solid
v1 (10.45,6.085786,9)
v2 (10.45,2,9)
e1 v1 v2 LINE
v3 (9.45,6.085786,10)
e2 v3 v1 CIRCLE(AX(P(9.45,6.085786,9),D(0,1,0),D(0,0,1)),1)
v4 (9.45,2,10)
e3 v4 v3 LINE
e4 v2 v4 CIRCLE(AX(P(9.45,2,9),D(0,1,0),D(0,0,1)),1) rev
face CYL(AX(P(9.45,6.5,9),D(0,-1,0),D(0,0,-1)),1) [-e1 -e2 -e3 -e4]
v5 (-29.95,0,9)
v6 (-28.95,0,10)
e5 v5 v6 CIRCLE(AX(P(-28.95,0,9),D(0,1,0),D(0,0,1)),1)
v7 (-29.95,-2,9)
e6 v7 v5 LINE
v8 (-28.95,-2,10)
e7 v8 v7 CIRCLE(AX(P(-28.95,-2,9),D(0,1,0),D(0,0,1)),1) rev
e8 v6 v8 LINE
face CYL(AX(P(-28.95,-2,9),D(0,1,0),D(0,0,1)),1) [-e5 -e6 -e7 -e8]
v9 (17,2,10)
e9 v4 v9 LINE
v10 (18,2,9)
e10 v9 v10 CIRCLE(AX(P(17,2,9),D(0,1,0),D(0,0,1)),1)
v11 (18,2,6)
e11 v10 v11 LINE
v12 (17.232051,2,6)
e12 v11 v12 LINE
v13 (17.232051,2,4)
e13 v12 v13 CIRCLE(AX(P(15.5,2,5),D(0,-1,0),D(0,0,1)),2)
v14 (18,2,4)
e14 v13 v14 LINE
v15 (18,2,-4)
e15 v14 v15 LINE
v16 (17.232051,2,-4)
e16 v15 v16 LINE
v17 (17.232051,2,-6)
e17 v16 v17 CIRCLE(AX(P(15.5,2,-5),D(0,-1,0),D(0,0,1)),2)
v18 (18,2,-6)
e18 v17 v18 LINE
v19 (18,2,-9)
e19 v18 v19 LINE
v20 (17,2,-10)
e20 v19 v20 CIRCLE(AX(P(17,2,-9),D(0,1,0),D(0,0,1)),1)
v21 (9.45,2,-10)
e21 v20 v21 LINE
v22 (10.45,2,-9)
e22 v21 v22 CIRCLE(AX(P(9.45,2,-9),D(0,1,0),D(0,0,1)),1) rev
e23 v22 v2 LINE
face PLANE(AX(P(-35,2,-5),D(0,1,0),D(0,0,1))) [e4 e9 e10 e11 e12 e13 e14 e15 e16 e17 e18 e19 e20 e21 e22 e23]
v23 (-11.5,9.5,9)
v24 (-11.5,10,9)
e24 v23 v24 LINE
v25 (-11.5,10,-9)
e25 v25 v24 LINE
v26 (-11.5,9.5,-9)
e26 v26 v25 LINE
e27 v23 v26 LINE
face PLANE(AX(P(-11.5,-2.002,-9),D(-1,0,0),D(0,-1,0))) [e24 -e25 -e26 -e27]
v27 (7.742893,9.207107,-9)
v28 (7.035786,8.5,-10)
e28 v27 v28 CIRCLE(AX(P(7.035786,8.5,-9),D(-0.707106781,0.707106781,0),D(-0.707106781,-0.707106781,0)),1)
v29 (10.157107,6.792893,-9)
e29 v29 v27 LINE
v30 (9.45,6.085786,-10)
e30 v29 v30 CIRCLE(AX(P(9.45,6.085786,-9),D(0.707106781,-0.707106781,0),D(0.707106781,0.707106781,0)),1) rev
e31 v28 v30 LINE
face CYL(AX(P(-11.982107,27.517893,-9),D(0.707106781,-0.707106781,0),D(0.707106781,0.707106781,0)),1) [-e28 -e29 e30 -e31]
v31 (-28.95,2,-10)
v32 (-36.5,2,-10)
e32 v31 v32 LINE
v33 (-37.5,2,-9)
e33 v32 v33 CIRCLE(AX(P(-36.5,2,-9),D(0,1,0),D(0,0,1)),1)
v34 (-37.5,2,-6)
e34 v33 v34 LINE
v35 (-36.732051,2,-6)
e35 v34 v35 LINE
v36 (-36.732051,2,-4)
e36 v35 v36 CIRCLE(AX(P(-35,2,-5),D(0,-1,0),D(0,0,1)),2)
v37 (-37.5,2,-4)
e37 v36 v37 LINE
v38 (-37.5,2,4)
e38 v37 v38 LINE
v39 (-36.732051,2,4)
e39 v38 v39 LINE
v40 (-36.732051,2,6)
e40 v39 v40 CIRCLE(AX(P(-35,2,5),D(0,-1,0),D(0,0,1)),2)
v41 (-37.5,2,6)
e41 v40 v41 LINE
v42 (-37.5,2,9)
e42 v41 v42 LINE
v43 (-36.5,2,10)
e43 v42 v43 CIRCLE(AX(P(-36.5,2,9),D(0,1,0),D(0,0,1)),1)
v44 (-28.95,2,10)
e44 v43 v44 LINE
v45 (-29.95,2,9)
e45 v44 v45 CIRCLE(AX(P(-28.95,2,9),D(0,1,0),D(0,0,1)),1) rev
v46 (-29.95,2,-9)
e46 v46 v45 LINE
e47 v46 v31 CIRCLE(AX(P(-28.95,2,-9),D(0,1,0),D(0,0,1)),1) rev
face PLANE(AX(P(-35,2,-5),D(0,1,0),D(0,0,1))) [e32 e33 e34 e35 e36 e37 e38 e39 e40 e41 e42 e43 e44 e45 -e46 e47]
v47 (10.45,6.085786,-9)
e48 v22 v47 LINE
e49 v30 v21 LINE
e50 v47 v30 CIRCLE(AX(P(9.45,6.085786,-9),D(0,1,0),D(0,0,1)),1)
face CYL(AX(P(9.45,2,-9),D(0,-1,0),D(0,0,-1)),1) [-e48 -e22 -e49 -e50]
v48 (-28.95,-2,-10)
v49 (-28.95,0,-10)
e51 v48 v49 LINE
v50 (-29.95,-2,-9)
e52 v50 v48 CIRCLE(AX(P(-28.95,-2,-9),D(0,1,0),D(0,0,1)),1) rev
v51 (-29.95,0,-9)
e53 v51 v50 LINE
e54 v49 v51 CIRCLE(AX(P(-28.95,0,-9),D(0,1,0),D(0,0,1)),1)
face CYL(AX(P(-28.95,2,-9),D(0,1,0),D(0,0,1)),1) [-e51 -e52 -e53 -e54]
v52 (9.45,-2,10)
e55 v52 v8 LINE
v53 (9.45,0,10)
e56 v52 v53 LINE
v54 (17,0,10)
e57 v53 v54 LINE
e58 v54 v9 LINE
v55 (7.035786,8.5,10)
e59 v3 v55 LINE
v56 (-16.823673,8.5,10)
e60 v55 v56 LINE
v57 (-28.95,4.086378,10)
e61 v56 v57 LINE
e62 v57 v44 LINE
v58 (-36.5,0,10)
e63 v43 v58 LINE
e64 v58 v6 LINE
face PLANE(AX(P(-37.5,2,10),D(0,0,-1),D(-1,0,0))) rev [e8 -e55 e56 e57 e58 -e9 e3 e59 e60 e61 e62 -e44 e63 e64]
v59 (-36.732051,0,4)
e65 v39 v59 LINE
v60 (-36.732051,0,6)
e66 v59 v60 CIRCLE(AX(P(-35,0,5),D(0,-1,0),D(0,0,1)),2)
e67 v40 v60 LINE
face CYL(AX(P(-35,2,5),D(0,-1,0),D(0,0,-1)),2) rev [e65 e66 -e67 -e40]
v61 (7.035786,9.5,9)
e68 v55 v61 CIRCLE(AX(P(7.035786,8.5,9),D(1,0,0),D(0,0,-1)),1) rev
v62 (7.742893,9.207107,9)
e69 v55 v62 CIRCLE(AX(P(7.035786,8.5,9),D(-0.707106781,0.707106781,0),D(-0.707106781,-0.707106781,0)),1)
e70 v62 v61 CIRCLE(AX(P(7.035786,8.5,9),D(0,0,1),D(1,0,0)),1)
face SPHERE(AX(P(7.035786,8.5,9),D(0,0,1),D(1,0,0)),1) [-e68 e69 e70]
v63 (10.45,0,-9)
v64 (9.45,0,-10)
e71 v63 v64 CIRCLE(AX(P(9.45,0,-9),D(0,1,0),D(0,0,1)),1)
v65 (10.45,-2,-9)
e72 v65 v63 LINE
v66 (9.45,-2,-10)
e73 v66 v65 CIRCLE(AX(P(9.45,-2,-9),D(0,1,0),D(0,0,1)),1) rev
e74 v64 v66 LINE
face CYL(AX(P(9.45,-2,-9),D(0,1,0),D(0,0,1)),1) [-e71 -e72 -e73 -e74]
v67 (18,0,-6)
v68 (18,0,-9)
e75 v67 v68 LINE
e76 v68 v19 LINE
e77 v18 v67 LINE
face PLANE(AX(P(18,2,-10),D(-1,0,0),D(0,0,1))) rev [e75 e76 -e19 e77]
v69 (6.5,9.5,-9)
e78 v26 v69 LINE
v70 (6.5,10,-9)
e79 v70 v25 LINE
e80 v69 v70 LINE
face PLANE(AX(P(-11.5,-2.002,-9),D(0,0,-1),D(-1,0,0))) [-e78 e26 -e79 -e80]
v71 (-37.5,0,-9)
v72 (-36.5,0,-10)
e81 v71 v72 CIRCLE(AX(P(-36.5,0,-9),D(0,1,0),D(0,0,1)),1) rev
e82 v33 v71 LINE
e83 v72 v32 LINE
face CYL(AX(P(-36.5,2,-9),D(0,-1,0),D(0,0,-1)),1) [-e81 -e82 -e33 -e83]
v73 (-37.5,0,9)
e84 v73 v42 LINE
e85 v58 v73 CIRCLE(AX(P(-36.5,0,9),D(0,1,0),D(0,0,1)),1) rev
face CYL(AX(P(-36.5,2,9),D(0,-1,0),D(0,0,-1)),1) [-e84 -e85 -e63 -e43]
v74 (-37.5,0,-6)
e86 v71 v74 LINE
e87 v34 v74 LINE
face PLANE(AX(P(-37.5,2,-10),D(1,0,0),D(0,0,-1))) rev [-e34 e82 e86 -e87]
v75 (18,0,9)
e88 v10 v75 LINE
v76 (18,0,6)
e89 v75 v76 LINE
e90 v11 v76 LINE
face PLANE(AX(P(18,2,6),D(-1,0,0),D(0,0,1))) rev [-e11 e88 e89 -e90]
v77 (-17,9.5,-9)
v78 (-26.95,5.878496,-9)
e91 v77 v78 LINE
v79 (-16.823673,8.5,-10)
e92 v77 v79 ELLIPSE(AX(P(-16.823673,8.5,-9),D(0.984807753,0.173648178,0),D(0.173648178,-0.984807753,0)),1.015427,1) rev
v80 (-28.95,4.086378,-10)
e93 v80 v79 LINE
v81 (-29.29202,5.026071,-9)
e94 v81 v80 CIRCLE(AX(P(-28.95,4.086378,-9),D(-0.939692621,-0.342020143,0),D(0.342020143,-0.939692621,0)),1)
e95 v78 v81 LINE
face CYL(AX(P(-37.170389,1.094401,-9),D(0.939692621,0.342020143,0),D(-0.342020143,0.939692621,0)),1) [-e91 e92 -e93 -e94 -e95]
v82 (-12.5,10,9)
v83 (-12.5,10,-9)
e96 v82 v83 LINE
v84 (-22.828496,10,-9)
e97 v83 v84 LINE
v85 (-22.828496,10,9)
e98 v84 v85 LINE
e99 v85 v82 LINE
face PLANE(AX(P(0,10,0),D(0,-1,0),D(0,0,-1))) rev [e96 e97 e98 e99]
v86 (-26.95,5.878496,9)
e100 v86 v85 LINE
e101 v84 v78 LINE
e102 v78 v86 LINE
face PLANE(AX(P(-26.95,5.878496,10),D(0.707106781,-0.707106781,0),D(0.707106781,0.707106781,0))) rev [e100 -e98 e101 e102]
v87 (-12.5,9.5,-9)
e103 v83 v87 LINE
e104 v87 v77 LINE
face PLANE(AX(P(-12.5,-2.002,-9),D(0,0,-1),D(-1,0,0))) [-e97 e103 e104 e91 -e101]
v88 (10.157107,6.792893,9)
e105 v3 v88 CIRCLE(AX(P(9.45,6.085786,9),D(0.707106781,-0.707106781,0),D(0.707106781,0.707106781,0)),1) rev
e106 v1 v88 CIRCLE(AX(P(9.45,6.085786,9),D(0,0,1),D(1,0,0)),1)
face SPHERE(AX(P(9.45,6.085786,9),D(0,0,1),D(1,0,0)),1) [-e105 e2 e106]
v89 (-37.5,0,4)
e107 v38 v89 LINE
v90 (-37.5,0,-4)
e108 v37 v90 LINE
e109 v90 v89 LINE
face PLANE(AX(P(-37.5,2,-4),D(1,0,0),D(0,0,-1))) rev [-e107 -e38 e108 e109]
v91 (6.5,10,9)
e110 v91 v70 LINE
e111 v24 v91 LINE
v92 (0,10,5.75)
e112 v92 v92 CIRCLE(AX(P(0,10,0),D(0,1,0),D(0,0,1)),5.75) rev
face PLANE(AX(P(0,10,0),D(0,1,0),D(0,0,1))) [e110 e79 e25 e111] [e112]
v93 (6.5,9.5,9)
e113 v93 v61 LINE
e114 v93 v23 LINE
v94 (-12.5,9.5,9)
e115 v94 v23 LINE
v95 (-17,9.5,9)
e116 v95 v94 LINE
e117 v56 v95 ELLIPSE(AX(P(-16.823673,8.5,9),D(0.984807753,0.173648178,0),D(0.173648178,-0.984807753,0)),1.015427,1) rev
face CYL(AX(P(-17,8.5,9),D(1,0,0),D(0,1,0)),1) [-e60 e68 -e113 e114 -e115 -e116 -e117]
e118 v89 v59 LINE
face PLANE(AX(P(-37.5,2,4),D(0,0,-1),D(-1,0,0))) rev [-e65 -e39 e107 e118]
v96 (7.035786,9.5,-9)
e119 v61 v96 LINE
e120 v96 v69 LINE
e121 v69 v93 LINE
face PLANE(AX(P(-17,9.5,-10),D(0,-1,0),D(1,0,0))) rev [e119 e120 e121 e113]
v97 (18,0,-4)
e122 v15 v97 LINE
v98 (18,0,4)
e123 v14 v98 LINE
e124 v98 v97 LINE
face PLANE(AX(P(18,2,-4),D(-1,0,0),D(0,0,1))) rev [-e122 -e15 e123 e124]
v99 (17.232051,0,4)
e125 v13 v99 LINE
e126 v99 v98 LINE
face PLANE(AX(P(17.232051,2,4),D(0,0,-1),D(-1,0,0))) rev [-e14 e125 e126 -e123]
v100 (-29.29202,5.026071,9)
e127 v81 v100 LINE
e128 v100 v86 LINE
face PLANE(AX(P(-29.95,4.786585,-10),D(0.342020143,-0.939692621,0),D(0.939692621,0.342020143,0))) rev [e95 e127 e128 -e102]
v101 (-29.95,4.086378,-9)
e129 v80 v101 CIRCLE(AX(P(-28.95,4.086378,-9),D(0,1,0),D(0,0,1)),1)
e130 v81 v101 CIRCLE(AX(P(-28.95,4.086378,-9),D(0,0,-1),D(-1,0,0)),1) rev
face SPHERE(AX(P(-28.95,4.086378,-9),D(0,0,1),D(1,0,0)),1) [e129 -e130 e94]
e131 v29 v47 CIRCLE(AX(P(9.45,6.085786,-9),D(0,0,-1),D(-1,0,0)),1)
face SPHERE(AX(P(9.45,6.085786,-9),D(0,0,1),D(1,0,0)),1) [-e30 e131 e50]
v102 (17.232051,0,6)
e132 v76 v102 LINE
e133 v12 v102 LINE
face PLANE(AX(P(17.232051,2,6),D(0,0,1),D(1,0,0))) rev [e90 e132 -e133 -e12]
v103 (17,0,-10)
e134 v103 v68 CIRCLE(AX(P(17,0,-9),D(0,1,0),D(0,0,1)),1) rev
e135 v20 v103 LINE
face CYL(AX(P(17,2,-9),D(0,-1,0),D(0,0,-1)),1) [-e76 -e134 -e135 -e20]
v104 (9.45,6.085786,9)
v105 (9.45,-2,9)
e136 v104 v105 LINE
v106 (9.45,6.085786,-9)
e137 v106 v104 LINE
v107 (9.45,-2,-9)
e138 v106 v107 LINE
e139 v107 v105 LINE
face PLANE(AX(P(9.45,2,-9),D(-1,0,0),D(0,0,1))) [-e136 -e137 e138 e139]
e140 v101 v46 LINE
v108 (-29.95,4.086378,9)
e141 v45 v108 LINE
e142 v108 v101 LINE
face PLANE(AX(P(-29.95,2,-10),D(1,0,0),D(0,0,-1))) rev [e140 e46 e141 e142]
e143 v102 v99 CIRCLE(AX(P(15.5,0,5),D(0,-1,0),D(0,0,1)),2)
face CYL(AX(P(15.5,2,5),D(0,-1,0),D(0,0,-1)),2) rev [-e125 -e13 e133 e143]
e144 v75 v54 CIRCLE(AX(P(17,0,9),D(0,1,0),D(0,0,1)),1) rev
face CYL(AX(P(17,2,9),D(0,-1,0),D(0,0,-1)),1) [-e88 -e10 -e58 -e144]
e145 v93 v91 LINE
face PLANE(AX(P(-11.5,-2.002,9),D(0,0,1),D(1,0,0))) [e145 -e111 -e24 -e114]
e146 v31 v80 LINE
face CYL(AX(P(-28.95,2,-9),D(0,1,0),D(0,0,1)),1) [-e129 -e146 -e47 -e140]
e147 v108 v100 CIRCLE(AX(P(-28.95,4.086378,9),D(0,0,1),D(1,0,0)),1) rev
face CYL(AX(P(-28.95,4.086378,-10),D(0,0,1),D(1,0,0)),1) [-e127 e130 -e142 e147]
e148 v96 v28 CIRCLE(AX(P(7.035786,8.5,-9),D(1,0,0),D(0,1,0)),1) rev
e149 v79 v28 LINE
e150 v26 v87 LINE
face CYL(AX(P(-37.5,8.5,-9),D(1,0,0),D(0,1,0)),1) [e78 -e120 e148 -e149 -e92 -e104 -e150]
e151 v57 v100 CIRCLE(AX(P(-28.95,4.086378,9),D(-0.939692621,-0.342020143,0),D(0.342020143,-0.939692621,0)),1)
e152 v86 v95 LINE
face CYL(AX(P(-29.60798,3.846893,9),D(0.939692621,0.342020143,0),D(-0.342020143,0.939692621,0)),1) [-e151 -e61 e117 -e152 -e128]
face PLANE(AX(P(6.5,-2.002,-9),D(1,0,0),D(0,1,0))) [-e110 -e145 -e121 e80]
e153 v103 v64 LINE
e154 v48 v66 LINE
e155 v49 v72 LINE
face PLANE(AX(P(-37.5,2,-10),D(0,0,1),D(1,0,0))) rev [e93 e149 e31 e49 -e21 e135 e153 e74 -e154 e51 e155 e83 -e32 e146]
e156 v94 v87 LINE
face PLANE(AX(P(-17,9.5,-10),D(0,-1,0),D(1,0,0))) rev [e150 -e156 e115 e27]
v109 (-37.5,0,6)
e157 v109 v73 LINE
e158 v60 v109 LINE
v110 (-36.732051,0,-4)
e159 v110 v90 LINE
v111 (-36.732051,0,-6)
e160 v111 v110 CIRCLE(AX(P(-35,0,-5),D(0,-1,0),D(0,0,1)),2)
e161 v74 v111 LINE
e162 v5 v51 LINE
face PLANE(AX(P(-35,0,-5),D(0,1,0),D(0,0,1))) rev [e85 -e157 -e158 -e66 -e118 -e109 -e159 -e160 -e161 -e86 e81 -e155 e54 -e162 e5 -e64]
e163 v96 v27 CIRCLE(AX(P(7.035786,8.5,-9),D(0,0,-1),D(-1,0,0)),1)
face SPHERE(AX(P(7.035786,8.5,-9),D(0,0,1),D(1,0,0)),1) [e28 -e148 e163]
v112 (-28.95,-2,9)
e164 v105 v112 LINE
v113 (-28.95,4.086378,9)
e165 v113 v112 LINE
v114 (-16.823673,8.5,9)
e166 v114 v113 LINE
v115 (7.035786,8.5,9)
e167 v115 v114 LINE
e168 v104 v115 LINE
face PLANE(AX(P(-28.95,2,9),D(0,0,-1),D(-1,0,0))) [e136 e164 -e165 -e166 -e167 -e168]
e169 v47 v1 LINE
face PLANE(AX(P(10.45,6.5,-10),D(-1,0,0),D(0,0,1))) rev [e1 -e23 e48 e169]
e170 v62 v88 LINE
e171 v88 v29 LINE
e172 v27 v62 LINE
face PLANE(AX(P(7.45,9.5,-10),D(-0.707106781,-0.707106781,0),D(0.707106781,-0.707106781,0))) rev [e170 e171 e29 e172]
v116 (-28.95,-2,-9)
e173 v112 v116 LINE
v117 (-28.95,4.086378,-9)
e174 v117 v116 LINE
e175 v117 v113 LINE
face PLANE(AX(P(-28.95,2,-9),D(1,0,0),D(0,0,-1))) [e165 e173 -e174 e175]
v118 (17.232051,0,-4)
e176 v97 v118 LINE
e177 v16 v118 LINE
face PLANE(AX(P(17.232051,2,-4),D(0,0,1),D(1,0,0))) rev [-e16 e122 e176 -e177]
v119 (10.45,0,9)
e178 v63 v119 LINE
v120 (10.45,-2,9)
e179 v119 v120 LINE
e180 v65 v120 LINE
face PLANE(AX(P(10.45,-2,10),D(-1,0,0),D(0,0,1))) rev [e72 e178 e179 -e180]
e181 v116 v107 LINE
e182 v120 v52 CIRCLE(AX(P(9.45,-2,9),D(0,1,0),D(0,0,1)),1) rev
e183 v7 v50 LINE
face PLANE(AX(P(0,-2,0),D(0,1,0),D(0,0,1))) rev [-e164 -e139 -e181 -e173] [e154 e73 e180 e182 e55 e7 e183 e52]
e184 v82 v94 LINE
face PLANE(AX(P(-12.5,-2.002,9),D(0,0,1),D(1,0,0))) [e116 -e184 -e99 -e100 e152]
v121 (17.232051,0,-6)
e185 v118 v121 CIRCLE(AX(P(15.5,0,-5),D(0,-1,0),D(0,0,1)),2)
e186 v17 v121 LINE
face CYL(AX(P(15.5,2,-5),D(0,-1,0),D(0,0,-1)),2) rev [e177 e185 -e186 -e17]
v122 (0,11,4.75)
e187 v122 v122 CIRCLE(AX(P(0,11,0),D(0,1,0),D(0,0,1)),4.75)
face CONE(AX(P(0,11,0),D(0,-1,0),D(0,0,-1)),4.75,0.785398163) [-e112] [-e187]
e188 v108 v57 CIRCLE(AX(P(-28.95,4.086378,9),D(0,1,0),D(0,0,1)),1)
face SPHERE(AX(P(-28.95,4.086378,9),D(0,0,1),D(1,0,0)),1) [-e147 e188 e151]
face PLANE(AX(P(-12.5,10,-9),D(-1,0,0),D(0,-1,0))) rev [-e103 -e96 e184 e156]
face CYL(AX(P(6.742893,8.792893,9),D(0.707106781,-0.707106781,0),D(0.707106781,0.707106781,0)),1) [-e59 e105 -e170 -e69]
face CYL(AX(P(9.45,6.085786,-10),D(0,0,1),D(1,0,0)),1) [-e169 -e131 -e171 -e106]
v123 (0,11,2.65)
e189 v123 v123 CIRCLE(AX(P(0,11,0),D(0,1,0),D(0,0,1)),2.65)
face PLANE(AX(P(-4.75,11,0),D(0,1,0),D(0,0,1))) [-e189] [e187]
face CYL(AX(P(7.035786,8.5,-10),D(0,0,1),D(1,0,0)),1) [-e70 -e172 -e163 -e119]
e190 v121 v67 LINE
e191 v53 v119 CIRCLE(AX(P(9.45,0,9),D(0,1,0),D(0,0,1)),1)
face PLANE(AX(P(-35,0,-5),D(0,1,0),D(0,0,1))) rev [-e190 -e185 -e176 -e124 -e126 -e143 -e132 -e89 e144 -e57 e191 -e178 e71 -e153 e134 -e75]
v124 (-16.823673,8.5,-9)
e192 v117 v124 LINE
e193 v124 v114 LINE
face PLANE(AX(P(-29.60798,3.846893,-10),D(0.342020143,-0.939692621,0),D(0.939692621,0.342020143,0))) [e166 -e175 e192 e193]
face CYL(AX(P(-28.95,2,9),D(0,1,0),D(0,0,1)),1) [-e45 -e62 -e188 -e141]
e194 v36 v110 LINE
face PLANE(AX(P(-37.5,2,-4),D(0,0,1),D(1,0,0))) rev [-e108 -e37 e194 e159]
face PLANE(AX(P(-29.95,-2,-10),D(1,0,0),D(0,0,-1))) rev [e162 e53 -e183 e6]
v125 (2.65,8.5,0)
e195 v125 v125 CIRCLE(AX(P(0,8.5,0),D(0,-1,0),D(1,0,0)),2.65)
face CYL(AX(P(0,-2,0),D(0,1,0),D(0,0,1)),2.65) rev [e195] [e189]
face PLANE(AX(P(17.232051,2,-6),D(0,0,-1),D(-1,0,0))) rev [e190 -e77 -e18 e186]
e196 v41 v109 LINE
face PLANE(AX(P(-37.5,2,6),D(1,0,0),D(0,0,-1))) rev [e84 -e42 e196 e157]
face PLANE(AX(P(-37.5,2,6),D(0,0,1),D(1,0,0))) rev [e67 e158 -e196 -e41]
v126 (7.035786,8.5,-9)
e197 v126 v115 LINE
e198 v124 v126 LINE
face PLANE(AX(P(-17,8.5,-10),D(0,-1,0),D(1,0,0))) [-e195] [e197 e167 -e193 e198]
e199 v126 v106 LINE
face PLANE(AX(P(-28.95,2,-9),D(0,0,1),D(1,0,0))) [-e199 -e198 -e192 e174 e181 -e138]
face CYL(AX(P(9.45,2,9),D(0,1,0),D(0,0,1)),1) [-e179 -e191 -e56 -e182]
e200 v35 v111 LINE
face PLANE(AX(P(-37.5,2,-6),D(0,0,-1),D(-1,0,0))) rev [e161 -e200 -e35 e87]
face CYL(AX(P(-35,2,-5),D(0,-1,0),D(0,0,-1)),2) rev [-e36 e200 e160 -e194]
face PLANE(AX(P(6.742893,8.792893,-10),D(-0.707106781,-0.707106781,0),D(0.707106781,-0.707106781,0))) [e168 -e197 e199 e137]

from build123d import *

# Parameters (mm, degrees)
ESQUISSE1_W              = 38.4
ESQUISSE1_H              = 18
BOSS_EXTRU_1_DEPTH       = 2
ESQUISSE2_W              = 40.4
ESQUISSE2_H              = 20
ESQUISSE2_W_2            = 38.4
ESQUISSE2_H_2            = 18
BOSS_EXTRU_2_DEPTH       = 2
EXTRU_MINCE1_DEPTH       = 10
EXTRU_MINCE1_DEPTH_BACK  = 10
BOSS_EXTRU_3_DEPTH       = 1
ESQUISSE6_R              = 2.65
ENL_V_MAT_EXTRU_1_DEPTH  = 41.929818
BOSS_EXTRU_7_START       = -9
BOSS_EXTRU_7_DEPTH       = 18
BOSS_EXTRU_7_2_OUTLINE_W = 18
BOSS_EXTRU_7_2_OUTLINE_H = 0.5
BOSS_EXTRU_7_2_DEPTH     = 6.350393
BOSS_EXTRU_7_START_2     = 2.65
BOSS_EXTRU_7_3_OUTLINE_W = 18
BOSS_EXTRU_7_3_OUTLINE_H = 0.5
BOSS_EXTRU_7_3_DEPTH     = 6.35
BOSS_EXTRU_7_START_3     = 9.5
BOSS_EXTRU_7_4_DEPTH     = 0.5
BOSS_EXTRU_7_5_DEPTH     = 0.5
CONG_1_R                 = 1
ENL_V_MAT_EXTRU_2_DEPTH  = 44.453999


with BuildPart() as part:
    # Esquisse1 → Boss.-Extru.1 (new body)
    with BuildSketch(Plane(origin=(0, 0, 0), x_dir=(1, 0, 0), z_dir=(0, 1, 0))):
        with BuildLine():
            Line((-37.5, 10), (18, 10))
            Line((18, 10), (18, 6))
            Line((18, 6), (17.232051, 6))
            ThreePointArc((17.232051, 6), (13.5, 5), (17.232051, 4))
            Line((17.232051, 4), (18, 4))
            Line((18, 4), (18, -4))
            Line((18, -4), (17.232051, -4))
            ThreePointArc((17.232051, -4), (13.5, -5), (17.232051, -6))
            Line((17.232051, -6), (18, -6))
            Line((18, -6), (18, -10))
            Line((18, -10), (-37.5, -10))
            Line((-37.5, -10), (-37.5, -6))
            Line((-37.5, -6), (-36.732051, -6))
            ThreePointArc((-36.732051, -6), (-33, -5), (-36.732051, -4))
            Line((-36.732051, -4), (-37.5, -4))
            Line((-37.5, -4), (-37.5, 4))
            Line((-37.5, 4), (-36.732051, 4))
            ThreePointArc((-36.732051, 4), (-33, 5), (-36.732051, 6))
            Line((-36.732051, 6), (-37.5, 6))
            Line((-37.5, 6), (-37.5, 10))
        make_face()
        with Locations((-9.75, 0)):
            Rectangle(ESQUISSE1_W, ESQUISSE1_H, mode=Mode.SUBTRACT)
    extrude(amount=BOSS_EXTRU_1_DEPTH)

    # Esquisse2 → Boss.-Extru.2 (add)
    with BuildSketch(Plane.XZ):
        with Locations((-9.75, 0)):
            Rectangle(ESQUISSE2_W, ESQUISSE2_H)
        with Locations((-9.75, 0)):
            Rectangle(ESQUISSE2_W_2, ESQUISSE2_H_2, mode=Mode.SUBTRACT)
    extrude(amount=BOSS_EXTRU_2_DEPTH)

    # Esquisse3 → Extru.-Mince1 (add, two sides: drawn at the far end of the back side and taken through both)
    with BuildSketch(Plane.XY.offset(-EXTRU_MINCE1_DEPTH_BACK)):
        Polygon((-29.95, 2), (-29.95, 4.786585), (-17, 9.5), (7.45, 9.5), (10.45, 6.5), (10.45, 2), (9.45, 2), (9.45, 6.085786), (7.035786, 8.5), (-16.823673, 8.5), (-28.95, 4.086378), (-28.95, 2), align=None)
    extrude(amount=EXTRU_MINCE1_DEPTH + EXTRU_MINCE1_DEPTH_BACK)

    # Esquisse4 → Boss.-Extru.3 (add)
    with BuildSketch(Plane.XY.offset(10)):
        Polygon((10.45, 6.5), (10.45, 2), (-29.95, 2), (-29.95, 4.786585), (-17, 9.5), (7.45, 9.5), align=None)
    boss_extru_3 = extrude(amount=-BOSS_EXTRU_3_DEPTH)

    # Symétrie1: Boss.-Extru.3 across plane
    add(boss_extru_3.mirror(Plane.XY))

    # Esquisse5 → Révolution1 (revolve)
    with BuildSketch(Plane.XY, mode=Mode.PRIVATE) as r_volution1_sk:
        Polygon((-6.25, 9.5), (-4.75, 11), (0, 11), (0, 10), (-4.335786, 10), (-5.542893, 8.792893), align=None)
    revolve(r_volution1_sk.sketch.rotate(Axis((0, 11, 0), (0, -1, 0)), 270), axis=Axis((0, 11, 0), (0, -1, 0)))

    # Esquisse6 → Enlèv. mat.-Extru.1 (cut, through all)
    with BuildSketch(Plane(origin=(0, 11, 0), x_dir=(1, 0, 0), z_dir=(0, 1, 0))):
        Circle(ESQUISSE6_R)
    extrude(amount=-ENL_V_MAT_EXTRU_1_DEPTH, mode=Mode.SUBTRACT)

    # Boss.-Extru.7: read off the stored shape, not the designer's step
    # Boss.-Extru.7 outline → Boss.-Extru.7 (add)
    with BuildSketch(Plane.XY.offset(BOSS_EXTRU_7_START)):
        Polygon((-12.5, 10), (-26.95, 10), (-26.95, 5.878496), (-17, 9.5), (-12.5, 9.5), align=None)
    extrude(amount=BOSS_EXTRU_7_DEPTH)

    # Boss.-Extru.7 2 outline → Boss.-Extru.7 2 (add)
    with BuildSketch(Plane.XY.offset(BOSS_EXTRU_7_START)):
        with Locations((-2.5, 9.75)):
            Rectangle(BOSS_EXTRU_7_2_OUTLINE_W, BOSS_EXTRU_7_2_OUTLINE_H)
    extrude(amount=BOSS_EXTRU_7_2_DEPTH)

    # Boss.-Extru.7 3 outline → Boss.-Extru.7 3 (add)
    with BuildSketch(Plane.XY.offset(BOSS_EXTRU_7_START_2)):
        with Locations((-2.5, 9.75)):
            Rectangle(BOSS_EXTRU_7_3_OUTLINE_W, BOSS_EXTRU_7_3_OUTLINE_H)
    extrude(amount=BOSS_EXTRU_7_3_DEPTH)

    # Boss.-Extru.7 4 outline → Boss.-Extru.7 4 (cut)
    with BuildSketch(Plane(origin=(0, 0, 0), x_dir=(1, 0, 0), z_dir=(0, 1, 0)).offset(BOSS_EXTRU_7_START_3)):
        with BuildLine():
            Line((-0.04562, 2.649607), (0.04562, 2.649607))
            ThreePointArc((0.04562, 2.649607), (0, 2.65), (-0.04562, 2.649607))
        make_face()
    extrude(amount=BOSS_EXTRU_7_4_DEPTH, mode=Mode.SUBTRACT)

    # Boss.-Extru.7 5 outline → Boss.-Extru.7 5 (add)
    with BuildSketch(Plane(origin=(0, 0, 0), x_dir=(1, 0, 0), z_dir=(0, 1, 0)).offset(BOSS_EXTRU_7_START_3)):
        with BuildLine():
            ThreePointArc((0.04562, 2.649607), (2.649902, -0.022811), (0, -2.65))
            Line((0, -2.65), (6.5, -2.65))
            Line((6.5, -2.65), (6.5, 2.649607))
            Line((6.5, 2.649607), (0.04562, 2.649607))
        make_face()
        with BuildLine():
            Line((-11.5, -2.65), (0, -2.65))
            ThreePointArc((0, -2.65), (-2.649902, -0.022811), (-0.04562, 2.649607))
            Line((-0.04562, 2.649607), (-11.5, 2.649607))
            Line((-11.5, 2.649607), (-11.5, -2.65))
        make_face()
    extrude(amount=BOSS_EXTRU_7_5_DEPTH)

    # Congé1
    cong_1_edges = [part.edges().sort_by_distance(p)[0] for p in [
        (-29.95, 4.786585, 0),
        (-23.475, 7.143293, -10),
        (-23.475, 7.143293, 10),
        (-4.775, 9.5, 10),
        (-4.775, 9.5, -10),
        (7.45, 9.5, 0),
        (10.45, 6.5, 0),
        (8.95, 8, 10),
        (8.95, 8, -10),
        (10.45, 4.25, 10),
        (10.45, 4.25, -10),
        (18, 1, -10),
        (18, 1, 10),
        (10.45, -1, 10),
        (-29.95, -1, 10),
        (-29.95, 3.393293, 10),
        (-29.95, 3.393293, -10),
        (-29.95, -1, -10),
        (-37.5, 1, -10),
        (-37.5, 1, 10),
        (10.45, -1, -10),
    ]]
    fillet(cong_1_edges, radius=CONG_1_R - 0.0001)  # a hair under: the kernel refuses the full size

    # Esquisse11 → Enlèv. mat.-Extru.2 (cut, through all)
    with BuildSketch(Plane(origin=(0, 0, -9), x_dir=(-1, 0, 0), z_dir=(0, 0, -1))):
        Polygon((26.95, 5.878496), (21.455546, 11.37295), (30.404027, 11.37295), align=None)
    extrude(amount=-ENL_V_MAT_EXTRU_2_DEPTH, mode=Mode.SUBTRACT)


solid = part.part
